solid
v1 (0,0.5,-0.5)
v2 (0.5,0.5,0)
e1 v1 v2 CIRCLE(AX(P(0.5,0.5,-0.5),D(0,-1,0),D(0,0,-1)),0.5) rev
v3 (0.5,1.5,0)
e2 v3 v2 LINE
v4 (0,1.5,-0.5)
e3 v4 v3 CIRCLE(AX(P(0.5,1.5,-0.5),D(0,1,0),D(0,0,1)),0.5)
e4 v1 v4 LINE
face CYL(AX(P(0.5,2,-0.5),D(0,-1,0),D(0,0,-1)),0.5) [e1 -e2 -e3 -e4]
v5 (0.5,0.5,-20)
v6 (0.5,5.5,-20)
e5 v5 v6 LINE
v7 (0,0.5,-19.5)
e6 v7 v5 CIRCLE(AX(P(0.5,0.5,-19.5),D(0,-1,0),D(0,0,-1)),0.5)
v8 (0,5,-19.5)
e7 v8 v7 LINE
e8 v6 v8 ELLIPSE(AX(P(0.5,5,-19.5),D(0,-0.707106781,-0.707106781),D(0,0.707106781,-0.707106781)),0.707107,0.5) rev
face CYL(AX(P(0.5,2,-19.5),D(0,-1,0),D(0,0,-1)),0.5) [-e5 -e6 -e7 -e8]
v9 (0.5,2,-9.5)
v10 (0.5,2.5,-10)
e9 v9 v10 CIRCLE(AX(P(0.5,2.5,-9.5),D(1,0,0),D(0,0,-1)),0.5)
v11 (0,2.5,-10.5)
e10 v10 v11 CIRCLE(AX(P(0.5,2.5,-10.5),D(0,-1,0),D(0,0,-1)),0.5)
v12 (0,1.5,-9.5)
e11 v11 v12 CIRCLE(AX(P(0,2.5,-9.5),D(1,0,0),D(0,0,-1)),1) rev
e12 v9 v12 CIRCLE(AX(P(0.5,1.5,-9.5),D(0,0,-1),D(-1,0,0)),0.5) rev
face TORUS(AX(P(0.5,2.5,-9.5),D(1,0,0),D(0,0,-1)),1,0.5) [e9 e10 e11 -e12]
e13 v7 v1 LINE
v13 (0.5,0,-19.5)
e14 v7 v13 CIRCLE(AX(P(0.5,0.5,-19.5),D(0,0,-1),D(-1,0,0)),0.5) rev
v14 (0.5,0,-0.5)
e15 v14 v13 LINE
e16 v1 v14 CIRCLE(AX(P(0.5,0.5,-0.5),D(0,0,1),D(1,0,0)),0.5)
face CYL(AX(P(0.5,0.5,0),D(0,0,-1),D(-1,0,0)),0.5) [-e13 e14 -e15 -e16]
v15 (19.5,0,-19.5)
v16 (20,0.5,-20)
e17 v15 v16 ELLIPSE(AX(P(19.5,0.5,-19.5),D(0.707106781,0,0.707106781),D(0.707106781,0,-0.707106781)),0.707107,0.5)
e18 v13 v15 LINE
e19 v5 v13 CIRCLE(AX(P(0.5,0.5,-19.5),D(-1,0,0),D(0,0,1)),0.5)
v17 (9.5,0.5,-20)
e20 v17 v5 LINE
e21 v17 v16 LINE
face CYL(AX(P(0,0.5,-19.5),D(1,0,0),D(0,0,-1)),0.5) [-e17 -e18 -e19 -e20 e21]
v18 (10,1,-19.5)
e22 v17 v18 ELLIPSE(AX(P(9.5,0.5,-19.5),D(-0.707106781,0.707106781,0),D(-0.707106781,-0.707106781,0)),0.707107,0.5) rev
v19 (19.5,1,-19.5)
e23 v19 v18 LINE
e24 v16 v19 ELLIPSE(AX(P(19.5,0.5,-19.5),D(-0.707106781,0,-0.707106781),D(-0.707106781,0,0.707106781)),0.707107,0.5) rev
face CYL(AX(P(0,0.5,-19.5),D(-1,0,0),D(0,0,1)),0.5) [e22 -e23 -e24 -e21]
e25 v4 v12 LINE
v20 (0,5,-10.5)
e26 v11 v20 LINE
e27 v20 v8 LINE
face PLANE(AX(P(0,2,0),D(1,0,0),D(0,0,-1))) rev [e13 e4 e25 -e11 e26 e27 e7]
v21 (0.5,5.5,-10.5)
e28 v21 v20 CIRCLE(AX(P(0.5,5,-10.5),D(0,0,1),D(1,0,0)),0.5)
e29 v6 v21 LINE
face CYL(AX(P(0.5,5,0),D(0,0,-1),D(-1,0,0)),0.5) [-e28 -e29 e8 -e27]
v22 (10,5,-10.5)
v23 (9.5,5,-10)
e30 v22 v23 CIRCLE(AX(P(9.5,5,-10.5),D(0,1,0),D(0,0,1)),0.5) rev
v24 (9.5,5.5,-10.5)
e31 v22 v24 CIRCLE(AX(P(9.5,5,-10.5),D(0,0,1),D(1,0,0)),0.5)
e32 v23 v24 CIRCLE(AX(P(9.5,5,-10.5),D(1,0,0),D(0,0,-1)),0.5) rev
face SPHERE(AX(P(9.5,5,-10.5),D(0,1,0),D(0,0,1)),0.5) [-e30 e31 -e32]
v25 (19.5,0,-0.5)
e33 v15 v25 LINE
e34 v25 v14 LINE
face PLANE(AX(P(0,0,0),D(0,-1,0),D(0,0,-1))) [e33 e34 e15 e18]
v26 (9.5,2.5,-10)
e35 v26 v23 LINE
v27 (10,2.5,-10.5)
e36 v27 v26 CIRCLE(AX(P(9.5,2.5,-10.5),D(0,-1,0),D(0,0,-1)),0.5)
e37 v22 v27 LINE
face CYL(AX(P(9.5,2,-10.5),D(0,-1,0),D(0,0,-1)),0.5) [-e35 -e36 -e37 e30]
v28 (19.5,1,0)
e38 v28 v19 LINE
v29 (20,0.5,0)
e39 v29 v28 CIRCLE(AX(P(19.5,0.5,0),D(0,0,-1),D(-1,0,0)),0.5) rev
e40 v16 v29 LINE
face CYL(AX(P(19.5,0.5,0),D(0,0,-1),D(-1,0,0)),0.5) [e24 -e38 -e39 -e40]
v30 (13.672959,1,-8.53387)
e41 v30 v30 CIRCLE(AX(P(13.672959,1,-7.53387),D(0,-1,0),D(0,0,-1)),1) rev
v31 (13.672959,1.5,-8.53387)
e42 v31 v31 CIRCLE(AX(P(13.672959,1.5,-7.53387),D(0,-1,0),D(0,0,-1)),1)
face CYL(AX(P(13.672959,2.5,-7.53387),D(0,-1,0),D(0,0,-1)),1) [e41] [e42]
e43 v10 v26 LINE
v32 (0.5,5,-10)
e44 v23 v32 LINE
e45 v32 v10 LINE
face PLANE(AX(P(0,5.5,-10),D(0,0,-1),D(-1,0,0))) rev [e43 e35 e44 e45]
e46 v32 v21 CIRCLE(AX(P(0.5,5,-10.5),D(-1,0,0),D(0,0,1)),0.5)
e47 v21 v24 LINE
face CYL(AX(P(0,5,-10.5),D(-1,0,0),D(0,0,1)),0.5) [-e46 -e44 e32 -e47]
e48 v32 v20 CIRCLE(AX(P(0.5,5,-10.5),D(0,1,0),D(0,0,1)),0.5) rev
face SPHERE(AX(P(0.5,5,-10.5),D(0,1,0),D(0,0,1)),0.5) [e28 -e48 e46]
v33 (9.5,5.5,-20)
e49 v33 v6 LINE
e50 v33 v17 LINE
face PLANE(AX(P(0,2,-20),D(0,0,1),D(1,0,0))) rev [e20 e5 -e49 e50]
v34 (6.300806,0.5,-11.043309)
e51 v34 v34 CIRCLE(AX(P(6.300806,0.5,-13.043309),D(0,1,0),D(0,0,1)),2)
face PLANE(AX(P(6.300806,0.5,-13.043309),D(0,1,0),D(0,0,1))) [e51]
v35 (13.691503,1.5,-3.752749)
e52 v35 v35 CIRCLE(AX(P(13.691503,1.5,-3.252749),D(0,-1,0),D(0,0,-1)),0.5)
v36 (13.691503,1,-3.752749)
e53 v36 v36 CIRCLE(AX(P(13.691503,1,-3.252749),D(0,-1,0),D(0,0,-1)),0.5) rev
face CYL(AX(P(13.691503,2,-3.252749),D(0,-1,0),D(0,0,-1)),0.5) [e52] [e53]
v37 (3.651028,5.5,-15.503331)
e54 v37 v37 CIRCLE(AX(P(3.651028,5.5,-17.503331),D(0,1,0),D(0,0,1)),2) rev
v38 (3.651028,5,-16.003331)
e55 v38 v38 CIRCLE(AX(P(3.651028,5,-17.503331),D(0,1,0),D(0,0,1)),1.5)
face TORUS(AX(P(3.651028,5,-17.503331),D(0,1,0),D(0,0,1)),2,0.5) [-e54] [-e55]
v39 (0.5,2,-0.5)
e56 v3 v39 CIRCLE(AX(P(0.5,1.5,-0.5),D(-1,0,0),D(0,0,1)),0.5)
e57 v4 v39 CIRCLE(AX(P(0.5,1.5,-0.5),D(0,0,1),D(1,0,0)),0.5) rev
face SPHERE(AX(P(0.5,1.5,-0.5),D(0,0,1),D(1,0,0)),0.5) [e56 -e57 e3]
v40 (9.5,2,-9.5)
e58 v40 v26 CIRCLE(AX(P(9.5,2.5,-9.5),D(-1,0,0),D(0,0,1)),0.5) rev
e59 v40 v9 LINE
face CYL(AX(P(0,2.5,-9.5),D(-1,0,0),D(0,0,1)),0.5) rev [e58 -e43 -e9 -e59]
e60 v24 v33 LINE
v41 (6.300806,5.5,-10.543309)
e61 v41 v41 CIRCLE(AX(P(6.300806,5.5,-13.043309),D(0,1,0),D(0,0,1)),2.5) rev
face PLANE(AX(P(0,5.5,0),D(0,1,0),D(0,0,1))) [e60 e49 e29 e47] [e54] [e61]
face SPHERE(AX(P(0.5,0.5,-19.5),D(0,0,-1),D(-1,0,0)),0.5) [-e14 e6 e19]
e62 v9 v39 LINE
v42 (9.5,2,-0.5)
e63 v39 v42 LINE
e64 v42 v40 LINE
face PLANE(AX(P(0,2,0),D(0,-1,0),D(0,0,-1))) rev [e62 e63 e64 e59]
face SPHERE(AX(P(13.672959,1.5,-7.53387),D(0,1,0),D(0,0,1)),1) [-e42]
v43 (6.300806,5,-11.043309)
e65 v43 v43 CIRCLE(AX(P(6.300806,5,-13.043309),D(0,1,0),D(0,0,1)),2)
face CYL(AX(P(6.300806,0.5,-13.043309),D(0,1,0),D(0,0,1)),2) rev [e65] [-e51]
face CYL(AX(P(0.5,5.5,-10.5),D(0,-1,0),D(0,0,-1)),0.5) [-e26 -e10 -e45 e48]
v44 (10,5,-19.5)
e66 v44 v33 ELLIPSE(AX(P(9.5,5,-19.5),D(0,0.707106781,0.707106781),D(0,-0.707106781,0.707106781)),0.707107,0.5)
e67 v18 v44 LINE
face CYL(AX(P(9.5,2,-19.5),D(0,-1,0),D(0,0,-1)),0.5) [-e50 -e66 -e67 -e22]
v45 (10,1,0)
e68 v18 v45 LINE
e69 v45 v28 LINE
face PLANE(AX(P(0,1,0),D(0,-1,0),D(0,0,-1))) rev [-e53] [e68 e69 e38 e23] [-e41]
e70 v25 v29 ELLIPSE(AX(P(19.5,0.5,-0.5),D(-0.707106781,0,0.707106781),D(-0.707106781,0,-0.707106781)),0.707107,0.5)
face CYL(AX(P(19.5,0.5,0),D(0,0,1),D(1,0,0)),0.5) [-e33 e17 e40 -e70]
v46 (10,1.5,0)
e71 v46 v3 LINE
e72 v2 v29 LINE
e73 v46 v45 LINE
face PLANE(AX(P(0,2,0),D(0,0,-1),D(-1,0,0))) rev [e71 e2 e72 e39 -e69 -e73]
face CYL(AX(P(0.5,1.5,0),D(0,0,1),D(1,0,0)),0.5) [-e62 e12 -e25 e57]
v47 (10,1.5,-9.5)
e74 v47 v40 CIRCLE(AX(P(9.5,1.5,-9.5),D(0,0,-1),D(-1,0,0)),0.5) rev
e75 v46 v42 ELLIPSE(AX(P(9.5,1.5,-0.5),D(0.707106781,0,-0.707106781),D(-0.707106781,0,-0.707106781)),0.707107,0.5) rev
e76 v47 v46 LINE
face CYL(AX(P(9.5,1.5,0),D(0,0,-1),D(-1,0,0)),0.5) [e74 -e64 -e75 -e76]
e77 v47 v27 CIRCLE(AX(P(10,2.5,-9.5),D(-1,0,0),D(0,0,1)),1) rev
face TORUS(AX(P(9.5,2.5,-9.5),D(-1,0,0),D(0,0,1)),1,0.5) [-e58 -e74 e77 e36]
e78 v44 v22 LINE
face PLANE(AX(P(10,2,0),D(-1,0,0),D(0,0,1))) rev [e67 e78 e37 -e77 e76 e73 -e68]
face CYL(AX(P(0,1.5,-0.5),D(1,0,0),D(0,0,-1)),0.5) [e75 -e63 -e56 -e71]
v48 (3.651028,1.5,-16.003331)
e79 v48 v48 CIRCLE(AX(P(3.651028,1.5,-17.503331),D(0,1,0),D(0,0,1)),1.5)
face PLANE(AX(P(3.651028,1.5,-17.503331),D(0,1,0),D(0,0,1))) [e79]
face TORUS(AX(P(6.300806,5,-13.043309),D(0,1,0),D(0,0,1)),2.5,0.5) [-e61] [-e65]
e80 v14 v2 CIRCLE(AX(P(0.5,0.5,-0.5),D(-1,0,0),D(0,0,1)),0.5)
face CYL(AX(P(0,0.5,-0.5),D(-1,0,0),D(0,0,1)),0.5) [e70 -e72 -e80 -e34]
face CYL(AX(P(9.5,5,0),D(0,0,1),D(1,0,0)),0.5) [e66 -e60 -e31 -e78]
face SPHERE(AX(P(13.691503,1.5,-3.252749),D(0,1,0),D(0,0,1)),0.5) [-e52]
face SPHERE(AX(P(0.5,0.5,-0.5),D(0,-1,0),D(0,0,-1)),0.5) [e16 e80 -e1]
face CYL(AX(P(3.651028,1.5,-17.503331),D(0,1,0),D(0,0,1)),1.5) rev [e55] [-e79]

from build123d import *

# Parameters (mm, degrees)
SKETCH1_W           = 10
SKETCH1_H           = 20
BOSS_EXTRUDE1_DEPTH = 2
SKETCH2_W           = 10
SKETCH2_H           = 20
BOSS_EXTRUDE2_DEPTH = 1
SKETCH3_R           = 0.5
BOSS_EXTRUDE3_DEPTH = 1
FILLET1_R           = 0.5
SKETCH4_R           = 1
BOSS_EXTRUDE4_DEPTH = 1.5
FILLET2_R           = 1
SKETCH5_W           = 10
SKETCH5_H           = 10
BOSS_EXTRUDE5_DEPTH = 3.5
SKETCH7_R           = 1.5
CUT_EXTRUDE1_DEPTH  = 4
SKETCH8_R           = 2
CUT_EXTRUDE2_DEPTH  = 5
FILLET3_R           = 0.5


with BuildPart() as part:
    # Sketch1 → Boss-Extrude1 (new body)
    with BuildSketch(Plane(origin=(0, 0, 0), x_dir=(1, 0, 0), z_dir=(0, 1, 0))):
        with Locations((5, 10)):
            Rectangle(SKETCH1_W, SKETCH1_H)
    extrude(amount=BOSS_EXTRUDE1_DEPTH)

    # Sketch2 → Boss-Extrude2 (add)
    with BuildSketch(Plane(origin=(0, 0, 0), x_dir=(1, 0, 0), z_dir=(0, 1, 0))):
        with Locations((15, 10)):
            Rectangle(SKETCH2_W, SKETCH2_H)
    extrude(amount=BOSS_EXTRUDE2_DEPTH)

    # Sketch3 → Boss-Extrude3 (add)
    with BuildSketch(Plane(origin=(0, 1, 0), x_dir=(1, 0, 0), z_dir=(0, 1, 0))):
        with Locations(Location((13.691502903, 3.252748725, 0), (0, 0, 90))):
            Circle(SKETCH3_R)
    extrude(amount=BOSS_EXTRUDE3_DEPTH)

    # Fillet1
    fillet1_edges = [part.edges().sort_by_distance(p)[0] for p in [
        (13.691502903, 2, -2.752748725),
    ]]
    fillet(fillet1_edges, radius=FILLET1_R)

    # Sketch4 → Boss-Extrude4 (add)
    with BuildSketch(Plane(origin=(0, 1, 0), x_dir=(1, 0, 0), z_dir=(0, 1, 0))):
        with Locations(Location((13.672959069, 7.53387034, 0), (0, 0, 90))):
            Circle(SKETCH4_R)
    extrude(amount=BOSS_EXTRUDE4_DEPTH)

    # Fillet2
    fillet2_edges = [part.edges().sort_by_distance(p)[0] for p in [
        (13.672959069, 2.5, -6.53387034),
    ]]
    fillet(fillet2_edges, radius=FILLET2_R)

    # Sketch5 → Boss-Extrude5 (add)
    with BuildSketch(Plane(origin=(0, 2, 0), x_dir=(1, 0, 0), z_dir=(0, 1, 0))):
        with Locations((5, 15)):
            Rectangle(SKETCH5_W, SKETCH5_H)
    extrude(amount=BOSS_EXTRUDE5_DEPTH)

    # Sketch7 → Cut-Extrude1 (cut)
    with BuildSketch(Plane(origin=(0, 5.5, 0), x_dir=(1, 0, 0), z_dir=(0, 1, 0))):
        with Locations(Location((3.651027896, 17.503330669, 0), (0, 0, 270))):
            Circle(SKETCH7_R)
    extrude(amount=-CUT_EXTRUDE1_DEPTH, mode=Mode.SUBTRACT)

    # Sketch8 → Cut-Extrude2 (cut)
    with BuildSketch(Plane(origin=(0, 5.5, 0), x_dir=(1, 0, 0), z_dir=(0, 1, 0))):
        with Locations(Location((6.300805509, 13.043308943, 0), (0, 0, 270))):
            Circle(SKETCH8_R)
    extrude(amount=-CUT_EXTRUDE2_DEPTH, mode=Mode.SUBTRACT)

    # Fillet3
    fillet3_edges = [part.edges().sort_by_distance(p)[0] for p in [
        (0, 2, -5),
        (20, 0, -10),
        (20, 1, -10),
        (10, 0, -20),
        (0, 0, -10),
        (10, 0, 0),
        (0, 1, 0),
        (5, 2, 0),
        (5, 2, -10),
        (10, 2, -5),
        (15, 1, -20),
        (0, 2.75, -20),
        (10, 3.25, -20),
        (10, 5.5, -15),
        (10, 3.75, -10),
        (0, 3.75, -10),
        (0, 5.5, -15),
        (5, 5.5, -10),
        (6.300805509, 5.5, -15.043308943),
        (3.651027896, 5.5, -19.003330669),
    ]]
    fillet(fillet3_edges, radius=FILLET3_R - 0.0001)  # a hair under: the kernel refuses the full size


solid = part.part
